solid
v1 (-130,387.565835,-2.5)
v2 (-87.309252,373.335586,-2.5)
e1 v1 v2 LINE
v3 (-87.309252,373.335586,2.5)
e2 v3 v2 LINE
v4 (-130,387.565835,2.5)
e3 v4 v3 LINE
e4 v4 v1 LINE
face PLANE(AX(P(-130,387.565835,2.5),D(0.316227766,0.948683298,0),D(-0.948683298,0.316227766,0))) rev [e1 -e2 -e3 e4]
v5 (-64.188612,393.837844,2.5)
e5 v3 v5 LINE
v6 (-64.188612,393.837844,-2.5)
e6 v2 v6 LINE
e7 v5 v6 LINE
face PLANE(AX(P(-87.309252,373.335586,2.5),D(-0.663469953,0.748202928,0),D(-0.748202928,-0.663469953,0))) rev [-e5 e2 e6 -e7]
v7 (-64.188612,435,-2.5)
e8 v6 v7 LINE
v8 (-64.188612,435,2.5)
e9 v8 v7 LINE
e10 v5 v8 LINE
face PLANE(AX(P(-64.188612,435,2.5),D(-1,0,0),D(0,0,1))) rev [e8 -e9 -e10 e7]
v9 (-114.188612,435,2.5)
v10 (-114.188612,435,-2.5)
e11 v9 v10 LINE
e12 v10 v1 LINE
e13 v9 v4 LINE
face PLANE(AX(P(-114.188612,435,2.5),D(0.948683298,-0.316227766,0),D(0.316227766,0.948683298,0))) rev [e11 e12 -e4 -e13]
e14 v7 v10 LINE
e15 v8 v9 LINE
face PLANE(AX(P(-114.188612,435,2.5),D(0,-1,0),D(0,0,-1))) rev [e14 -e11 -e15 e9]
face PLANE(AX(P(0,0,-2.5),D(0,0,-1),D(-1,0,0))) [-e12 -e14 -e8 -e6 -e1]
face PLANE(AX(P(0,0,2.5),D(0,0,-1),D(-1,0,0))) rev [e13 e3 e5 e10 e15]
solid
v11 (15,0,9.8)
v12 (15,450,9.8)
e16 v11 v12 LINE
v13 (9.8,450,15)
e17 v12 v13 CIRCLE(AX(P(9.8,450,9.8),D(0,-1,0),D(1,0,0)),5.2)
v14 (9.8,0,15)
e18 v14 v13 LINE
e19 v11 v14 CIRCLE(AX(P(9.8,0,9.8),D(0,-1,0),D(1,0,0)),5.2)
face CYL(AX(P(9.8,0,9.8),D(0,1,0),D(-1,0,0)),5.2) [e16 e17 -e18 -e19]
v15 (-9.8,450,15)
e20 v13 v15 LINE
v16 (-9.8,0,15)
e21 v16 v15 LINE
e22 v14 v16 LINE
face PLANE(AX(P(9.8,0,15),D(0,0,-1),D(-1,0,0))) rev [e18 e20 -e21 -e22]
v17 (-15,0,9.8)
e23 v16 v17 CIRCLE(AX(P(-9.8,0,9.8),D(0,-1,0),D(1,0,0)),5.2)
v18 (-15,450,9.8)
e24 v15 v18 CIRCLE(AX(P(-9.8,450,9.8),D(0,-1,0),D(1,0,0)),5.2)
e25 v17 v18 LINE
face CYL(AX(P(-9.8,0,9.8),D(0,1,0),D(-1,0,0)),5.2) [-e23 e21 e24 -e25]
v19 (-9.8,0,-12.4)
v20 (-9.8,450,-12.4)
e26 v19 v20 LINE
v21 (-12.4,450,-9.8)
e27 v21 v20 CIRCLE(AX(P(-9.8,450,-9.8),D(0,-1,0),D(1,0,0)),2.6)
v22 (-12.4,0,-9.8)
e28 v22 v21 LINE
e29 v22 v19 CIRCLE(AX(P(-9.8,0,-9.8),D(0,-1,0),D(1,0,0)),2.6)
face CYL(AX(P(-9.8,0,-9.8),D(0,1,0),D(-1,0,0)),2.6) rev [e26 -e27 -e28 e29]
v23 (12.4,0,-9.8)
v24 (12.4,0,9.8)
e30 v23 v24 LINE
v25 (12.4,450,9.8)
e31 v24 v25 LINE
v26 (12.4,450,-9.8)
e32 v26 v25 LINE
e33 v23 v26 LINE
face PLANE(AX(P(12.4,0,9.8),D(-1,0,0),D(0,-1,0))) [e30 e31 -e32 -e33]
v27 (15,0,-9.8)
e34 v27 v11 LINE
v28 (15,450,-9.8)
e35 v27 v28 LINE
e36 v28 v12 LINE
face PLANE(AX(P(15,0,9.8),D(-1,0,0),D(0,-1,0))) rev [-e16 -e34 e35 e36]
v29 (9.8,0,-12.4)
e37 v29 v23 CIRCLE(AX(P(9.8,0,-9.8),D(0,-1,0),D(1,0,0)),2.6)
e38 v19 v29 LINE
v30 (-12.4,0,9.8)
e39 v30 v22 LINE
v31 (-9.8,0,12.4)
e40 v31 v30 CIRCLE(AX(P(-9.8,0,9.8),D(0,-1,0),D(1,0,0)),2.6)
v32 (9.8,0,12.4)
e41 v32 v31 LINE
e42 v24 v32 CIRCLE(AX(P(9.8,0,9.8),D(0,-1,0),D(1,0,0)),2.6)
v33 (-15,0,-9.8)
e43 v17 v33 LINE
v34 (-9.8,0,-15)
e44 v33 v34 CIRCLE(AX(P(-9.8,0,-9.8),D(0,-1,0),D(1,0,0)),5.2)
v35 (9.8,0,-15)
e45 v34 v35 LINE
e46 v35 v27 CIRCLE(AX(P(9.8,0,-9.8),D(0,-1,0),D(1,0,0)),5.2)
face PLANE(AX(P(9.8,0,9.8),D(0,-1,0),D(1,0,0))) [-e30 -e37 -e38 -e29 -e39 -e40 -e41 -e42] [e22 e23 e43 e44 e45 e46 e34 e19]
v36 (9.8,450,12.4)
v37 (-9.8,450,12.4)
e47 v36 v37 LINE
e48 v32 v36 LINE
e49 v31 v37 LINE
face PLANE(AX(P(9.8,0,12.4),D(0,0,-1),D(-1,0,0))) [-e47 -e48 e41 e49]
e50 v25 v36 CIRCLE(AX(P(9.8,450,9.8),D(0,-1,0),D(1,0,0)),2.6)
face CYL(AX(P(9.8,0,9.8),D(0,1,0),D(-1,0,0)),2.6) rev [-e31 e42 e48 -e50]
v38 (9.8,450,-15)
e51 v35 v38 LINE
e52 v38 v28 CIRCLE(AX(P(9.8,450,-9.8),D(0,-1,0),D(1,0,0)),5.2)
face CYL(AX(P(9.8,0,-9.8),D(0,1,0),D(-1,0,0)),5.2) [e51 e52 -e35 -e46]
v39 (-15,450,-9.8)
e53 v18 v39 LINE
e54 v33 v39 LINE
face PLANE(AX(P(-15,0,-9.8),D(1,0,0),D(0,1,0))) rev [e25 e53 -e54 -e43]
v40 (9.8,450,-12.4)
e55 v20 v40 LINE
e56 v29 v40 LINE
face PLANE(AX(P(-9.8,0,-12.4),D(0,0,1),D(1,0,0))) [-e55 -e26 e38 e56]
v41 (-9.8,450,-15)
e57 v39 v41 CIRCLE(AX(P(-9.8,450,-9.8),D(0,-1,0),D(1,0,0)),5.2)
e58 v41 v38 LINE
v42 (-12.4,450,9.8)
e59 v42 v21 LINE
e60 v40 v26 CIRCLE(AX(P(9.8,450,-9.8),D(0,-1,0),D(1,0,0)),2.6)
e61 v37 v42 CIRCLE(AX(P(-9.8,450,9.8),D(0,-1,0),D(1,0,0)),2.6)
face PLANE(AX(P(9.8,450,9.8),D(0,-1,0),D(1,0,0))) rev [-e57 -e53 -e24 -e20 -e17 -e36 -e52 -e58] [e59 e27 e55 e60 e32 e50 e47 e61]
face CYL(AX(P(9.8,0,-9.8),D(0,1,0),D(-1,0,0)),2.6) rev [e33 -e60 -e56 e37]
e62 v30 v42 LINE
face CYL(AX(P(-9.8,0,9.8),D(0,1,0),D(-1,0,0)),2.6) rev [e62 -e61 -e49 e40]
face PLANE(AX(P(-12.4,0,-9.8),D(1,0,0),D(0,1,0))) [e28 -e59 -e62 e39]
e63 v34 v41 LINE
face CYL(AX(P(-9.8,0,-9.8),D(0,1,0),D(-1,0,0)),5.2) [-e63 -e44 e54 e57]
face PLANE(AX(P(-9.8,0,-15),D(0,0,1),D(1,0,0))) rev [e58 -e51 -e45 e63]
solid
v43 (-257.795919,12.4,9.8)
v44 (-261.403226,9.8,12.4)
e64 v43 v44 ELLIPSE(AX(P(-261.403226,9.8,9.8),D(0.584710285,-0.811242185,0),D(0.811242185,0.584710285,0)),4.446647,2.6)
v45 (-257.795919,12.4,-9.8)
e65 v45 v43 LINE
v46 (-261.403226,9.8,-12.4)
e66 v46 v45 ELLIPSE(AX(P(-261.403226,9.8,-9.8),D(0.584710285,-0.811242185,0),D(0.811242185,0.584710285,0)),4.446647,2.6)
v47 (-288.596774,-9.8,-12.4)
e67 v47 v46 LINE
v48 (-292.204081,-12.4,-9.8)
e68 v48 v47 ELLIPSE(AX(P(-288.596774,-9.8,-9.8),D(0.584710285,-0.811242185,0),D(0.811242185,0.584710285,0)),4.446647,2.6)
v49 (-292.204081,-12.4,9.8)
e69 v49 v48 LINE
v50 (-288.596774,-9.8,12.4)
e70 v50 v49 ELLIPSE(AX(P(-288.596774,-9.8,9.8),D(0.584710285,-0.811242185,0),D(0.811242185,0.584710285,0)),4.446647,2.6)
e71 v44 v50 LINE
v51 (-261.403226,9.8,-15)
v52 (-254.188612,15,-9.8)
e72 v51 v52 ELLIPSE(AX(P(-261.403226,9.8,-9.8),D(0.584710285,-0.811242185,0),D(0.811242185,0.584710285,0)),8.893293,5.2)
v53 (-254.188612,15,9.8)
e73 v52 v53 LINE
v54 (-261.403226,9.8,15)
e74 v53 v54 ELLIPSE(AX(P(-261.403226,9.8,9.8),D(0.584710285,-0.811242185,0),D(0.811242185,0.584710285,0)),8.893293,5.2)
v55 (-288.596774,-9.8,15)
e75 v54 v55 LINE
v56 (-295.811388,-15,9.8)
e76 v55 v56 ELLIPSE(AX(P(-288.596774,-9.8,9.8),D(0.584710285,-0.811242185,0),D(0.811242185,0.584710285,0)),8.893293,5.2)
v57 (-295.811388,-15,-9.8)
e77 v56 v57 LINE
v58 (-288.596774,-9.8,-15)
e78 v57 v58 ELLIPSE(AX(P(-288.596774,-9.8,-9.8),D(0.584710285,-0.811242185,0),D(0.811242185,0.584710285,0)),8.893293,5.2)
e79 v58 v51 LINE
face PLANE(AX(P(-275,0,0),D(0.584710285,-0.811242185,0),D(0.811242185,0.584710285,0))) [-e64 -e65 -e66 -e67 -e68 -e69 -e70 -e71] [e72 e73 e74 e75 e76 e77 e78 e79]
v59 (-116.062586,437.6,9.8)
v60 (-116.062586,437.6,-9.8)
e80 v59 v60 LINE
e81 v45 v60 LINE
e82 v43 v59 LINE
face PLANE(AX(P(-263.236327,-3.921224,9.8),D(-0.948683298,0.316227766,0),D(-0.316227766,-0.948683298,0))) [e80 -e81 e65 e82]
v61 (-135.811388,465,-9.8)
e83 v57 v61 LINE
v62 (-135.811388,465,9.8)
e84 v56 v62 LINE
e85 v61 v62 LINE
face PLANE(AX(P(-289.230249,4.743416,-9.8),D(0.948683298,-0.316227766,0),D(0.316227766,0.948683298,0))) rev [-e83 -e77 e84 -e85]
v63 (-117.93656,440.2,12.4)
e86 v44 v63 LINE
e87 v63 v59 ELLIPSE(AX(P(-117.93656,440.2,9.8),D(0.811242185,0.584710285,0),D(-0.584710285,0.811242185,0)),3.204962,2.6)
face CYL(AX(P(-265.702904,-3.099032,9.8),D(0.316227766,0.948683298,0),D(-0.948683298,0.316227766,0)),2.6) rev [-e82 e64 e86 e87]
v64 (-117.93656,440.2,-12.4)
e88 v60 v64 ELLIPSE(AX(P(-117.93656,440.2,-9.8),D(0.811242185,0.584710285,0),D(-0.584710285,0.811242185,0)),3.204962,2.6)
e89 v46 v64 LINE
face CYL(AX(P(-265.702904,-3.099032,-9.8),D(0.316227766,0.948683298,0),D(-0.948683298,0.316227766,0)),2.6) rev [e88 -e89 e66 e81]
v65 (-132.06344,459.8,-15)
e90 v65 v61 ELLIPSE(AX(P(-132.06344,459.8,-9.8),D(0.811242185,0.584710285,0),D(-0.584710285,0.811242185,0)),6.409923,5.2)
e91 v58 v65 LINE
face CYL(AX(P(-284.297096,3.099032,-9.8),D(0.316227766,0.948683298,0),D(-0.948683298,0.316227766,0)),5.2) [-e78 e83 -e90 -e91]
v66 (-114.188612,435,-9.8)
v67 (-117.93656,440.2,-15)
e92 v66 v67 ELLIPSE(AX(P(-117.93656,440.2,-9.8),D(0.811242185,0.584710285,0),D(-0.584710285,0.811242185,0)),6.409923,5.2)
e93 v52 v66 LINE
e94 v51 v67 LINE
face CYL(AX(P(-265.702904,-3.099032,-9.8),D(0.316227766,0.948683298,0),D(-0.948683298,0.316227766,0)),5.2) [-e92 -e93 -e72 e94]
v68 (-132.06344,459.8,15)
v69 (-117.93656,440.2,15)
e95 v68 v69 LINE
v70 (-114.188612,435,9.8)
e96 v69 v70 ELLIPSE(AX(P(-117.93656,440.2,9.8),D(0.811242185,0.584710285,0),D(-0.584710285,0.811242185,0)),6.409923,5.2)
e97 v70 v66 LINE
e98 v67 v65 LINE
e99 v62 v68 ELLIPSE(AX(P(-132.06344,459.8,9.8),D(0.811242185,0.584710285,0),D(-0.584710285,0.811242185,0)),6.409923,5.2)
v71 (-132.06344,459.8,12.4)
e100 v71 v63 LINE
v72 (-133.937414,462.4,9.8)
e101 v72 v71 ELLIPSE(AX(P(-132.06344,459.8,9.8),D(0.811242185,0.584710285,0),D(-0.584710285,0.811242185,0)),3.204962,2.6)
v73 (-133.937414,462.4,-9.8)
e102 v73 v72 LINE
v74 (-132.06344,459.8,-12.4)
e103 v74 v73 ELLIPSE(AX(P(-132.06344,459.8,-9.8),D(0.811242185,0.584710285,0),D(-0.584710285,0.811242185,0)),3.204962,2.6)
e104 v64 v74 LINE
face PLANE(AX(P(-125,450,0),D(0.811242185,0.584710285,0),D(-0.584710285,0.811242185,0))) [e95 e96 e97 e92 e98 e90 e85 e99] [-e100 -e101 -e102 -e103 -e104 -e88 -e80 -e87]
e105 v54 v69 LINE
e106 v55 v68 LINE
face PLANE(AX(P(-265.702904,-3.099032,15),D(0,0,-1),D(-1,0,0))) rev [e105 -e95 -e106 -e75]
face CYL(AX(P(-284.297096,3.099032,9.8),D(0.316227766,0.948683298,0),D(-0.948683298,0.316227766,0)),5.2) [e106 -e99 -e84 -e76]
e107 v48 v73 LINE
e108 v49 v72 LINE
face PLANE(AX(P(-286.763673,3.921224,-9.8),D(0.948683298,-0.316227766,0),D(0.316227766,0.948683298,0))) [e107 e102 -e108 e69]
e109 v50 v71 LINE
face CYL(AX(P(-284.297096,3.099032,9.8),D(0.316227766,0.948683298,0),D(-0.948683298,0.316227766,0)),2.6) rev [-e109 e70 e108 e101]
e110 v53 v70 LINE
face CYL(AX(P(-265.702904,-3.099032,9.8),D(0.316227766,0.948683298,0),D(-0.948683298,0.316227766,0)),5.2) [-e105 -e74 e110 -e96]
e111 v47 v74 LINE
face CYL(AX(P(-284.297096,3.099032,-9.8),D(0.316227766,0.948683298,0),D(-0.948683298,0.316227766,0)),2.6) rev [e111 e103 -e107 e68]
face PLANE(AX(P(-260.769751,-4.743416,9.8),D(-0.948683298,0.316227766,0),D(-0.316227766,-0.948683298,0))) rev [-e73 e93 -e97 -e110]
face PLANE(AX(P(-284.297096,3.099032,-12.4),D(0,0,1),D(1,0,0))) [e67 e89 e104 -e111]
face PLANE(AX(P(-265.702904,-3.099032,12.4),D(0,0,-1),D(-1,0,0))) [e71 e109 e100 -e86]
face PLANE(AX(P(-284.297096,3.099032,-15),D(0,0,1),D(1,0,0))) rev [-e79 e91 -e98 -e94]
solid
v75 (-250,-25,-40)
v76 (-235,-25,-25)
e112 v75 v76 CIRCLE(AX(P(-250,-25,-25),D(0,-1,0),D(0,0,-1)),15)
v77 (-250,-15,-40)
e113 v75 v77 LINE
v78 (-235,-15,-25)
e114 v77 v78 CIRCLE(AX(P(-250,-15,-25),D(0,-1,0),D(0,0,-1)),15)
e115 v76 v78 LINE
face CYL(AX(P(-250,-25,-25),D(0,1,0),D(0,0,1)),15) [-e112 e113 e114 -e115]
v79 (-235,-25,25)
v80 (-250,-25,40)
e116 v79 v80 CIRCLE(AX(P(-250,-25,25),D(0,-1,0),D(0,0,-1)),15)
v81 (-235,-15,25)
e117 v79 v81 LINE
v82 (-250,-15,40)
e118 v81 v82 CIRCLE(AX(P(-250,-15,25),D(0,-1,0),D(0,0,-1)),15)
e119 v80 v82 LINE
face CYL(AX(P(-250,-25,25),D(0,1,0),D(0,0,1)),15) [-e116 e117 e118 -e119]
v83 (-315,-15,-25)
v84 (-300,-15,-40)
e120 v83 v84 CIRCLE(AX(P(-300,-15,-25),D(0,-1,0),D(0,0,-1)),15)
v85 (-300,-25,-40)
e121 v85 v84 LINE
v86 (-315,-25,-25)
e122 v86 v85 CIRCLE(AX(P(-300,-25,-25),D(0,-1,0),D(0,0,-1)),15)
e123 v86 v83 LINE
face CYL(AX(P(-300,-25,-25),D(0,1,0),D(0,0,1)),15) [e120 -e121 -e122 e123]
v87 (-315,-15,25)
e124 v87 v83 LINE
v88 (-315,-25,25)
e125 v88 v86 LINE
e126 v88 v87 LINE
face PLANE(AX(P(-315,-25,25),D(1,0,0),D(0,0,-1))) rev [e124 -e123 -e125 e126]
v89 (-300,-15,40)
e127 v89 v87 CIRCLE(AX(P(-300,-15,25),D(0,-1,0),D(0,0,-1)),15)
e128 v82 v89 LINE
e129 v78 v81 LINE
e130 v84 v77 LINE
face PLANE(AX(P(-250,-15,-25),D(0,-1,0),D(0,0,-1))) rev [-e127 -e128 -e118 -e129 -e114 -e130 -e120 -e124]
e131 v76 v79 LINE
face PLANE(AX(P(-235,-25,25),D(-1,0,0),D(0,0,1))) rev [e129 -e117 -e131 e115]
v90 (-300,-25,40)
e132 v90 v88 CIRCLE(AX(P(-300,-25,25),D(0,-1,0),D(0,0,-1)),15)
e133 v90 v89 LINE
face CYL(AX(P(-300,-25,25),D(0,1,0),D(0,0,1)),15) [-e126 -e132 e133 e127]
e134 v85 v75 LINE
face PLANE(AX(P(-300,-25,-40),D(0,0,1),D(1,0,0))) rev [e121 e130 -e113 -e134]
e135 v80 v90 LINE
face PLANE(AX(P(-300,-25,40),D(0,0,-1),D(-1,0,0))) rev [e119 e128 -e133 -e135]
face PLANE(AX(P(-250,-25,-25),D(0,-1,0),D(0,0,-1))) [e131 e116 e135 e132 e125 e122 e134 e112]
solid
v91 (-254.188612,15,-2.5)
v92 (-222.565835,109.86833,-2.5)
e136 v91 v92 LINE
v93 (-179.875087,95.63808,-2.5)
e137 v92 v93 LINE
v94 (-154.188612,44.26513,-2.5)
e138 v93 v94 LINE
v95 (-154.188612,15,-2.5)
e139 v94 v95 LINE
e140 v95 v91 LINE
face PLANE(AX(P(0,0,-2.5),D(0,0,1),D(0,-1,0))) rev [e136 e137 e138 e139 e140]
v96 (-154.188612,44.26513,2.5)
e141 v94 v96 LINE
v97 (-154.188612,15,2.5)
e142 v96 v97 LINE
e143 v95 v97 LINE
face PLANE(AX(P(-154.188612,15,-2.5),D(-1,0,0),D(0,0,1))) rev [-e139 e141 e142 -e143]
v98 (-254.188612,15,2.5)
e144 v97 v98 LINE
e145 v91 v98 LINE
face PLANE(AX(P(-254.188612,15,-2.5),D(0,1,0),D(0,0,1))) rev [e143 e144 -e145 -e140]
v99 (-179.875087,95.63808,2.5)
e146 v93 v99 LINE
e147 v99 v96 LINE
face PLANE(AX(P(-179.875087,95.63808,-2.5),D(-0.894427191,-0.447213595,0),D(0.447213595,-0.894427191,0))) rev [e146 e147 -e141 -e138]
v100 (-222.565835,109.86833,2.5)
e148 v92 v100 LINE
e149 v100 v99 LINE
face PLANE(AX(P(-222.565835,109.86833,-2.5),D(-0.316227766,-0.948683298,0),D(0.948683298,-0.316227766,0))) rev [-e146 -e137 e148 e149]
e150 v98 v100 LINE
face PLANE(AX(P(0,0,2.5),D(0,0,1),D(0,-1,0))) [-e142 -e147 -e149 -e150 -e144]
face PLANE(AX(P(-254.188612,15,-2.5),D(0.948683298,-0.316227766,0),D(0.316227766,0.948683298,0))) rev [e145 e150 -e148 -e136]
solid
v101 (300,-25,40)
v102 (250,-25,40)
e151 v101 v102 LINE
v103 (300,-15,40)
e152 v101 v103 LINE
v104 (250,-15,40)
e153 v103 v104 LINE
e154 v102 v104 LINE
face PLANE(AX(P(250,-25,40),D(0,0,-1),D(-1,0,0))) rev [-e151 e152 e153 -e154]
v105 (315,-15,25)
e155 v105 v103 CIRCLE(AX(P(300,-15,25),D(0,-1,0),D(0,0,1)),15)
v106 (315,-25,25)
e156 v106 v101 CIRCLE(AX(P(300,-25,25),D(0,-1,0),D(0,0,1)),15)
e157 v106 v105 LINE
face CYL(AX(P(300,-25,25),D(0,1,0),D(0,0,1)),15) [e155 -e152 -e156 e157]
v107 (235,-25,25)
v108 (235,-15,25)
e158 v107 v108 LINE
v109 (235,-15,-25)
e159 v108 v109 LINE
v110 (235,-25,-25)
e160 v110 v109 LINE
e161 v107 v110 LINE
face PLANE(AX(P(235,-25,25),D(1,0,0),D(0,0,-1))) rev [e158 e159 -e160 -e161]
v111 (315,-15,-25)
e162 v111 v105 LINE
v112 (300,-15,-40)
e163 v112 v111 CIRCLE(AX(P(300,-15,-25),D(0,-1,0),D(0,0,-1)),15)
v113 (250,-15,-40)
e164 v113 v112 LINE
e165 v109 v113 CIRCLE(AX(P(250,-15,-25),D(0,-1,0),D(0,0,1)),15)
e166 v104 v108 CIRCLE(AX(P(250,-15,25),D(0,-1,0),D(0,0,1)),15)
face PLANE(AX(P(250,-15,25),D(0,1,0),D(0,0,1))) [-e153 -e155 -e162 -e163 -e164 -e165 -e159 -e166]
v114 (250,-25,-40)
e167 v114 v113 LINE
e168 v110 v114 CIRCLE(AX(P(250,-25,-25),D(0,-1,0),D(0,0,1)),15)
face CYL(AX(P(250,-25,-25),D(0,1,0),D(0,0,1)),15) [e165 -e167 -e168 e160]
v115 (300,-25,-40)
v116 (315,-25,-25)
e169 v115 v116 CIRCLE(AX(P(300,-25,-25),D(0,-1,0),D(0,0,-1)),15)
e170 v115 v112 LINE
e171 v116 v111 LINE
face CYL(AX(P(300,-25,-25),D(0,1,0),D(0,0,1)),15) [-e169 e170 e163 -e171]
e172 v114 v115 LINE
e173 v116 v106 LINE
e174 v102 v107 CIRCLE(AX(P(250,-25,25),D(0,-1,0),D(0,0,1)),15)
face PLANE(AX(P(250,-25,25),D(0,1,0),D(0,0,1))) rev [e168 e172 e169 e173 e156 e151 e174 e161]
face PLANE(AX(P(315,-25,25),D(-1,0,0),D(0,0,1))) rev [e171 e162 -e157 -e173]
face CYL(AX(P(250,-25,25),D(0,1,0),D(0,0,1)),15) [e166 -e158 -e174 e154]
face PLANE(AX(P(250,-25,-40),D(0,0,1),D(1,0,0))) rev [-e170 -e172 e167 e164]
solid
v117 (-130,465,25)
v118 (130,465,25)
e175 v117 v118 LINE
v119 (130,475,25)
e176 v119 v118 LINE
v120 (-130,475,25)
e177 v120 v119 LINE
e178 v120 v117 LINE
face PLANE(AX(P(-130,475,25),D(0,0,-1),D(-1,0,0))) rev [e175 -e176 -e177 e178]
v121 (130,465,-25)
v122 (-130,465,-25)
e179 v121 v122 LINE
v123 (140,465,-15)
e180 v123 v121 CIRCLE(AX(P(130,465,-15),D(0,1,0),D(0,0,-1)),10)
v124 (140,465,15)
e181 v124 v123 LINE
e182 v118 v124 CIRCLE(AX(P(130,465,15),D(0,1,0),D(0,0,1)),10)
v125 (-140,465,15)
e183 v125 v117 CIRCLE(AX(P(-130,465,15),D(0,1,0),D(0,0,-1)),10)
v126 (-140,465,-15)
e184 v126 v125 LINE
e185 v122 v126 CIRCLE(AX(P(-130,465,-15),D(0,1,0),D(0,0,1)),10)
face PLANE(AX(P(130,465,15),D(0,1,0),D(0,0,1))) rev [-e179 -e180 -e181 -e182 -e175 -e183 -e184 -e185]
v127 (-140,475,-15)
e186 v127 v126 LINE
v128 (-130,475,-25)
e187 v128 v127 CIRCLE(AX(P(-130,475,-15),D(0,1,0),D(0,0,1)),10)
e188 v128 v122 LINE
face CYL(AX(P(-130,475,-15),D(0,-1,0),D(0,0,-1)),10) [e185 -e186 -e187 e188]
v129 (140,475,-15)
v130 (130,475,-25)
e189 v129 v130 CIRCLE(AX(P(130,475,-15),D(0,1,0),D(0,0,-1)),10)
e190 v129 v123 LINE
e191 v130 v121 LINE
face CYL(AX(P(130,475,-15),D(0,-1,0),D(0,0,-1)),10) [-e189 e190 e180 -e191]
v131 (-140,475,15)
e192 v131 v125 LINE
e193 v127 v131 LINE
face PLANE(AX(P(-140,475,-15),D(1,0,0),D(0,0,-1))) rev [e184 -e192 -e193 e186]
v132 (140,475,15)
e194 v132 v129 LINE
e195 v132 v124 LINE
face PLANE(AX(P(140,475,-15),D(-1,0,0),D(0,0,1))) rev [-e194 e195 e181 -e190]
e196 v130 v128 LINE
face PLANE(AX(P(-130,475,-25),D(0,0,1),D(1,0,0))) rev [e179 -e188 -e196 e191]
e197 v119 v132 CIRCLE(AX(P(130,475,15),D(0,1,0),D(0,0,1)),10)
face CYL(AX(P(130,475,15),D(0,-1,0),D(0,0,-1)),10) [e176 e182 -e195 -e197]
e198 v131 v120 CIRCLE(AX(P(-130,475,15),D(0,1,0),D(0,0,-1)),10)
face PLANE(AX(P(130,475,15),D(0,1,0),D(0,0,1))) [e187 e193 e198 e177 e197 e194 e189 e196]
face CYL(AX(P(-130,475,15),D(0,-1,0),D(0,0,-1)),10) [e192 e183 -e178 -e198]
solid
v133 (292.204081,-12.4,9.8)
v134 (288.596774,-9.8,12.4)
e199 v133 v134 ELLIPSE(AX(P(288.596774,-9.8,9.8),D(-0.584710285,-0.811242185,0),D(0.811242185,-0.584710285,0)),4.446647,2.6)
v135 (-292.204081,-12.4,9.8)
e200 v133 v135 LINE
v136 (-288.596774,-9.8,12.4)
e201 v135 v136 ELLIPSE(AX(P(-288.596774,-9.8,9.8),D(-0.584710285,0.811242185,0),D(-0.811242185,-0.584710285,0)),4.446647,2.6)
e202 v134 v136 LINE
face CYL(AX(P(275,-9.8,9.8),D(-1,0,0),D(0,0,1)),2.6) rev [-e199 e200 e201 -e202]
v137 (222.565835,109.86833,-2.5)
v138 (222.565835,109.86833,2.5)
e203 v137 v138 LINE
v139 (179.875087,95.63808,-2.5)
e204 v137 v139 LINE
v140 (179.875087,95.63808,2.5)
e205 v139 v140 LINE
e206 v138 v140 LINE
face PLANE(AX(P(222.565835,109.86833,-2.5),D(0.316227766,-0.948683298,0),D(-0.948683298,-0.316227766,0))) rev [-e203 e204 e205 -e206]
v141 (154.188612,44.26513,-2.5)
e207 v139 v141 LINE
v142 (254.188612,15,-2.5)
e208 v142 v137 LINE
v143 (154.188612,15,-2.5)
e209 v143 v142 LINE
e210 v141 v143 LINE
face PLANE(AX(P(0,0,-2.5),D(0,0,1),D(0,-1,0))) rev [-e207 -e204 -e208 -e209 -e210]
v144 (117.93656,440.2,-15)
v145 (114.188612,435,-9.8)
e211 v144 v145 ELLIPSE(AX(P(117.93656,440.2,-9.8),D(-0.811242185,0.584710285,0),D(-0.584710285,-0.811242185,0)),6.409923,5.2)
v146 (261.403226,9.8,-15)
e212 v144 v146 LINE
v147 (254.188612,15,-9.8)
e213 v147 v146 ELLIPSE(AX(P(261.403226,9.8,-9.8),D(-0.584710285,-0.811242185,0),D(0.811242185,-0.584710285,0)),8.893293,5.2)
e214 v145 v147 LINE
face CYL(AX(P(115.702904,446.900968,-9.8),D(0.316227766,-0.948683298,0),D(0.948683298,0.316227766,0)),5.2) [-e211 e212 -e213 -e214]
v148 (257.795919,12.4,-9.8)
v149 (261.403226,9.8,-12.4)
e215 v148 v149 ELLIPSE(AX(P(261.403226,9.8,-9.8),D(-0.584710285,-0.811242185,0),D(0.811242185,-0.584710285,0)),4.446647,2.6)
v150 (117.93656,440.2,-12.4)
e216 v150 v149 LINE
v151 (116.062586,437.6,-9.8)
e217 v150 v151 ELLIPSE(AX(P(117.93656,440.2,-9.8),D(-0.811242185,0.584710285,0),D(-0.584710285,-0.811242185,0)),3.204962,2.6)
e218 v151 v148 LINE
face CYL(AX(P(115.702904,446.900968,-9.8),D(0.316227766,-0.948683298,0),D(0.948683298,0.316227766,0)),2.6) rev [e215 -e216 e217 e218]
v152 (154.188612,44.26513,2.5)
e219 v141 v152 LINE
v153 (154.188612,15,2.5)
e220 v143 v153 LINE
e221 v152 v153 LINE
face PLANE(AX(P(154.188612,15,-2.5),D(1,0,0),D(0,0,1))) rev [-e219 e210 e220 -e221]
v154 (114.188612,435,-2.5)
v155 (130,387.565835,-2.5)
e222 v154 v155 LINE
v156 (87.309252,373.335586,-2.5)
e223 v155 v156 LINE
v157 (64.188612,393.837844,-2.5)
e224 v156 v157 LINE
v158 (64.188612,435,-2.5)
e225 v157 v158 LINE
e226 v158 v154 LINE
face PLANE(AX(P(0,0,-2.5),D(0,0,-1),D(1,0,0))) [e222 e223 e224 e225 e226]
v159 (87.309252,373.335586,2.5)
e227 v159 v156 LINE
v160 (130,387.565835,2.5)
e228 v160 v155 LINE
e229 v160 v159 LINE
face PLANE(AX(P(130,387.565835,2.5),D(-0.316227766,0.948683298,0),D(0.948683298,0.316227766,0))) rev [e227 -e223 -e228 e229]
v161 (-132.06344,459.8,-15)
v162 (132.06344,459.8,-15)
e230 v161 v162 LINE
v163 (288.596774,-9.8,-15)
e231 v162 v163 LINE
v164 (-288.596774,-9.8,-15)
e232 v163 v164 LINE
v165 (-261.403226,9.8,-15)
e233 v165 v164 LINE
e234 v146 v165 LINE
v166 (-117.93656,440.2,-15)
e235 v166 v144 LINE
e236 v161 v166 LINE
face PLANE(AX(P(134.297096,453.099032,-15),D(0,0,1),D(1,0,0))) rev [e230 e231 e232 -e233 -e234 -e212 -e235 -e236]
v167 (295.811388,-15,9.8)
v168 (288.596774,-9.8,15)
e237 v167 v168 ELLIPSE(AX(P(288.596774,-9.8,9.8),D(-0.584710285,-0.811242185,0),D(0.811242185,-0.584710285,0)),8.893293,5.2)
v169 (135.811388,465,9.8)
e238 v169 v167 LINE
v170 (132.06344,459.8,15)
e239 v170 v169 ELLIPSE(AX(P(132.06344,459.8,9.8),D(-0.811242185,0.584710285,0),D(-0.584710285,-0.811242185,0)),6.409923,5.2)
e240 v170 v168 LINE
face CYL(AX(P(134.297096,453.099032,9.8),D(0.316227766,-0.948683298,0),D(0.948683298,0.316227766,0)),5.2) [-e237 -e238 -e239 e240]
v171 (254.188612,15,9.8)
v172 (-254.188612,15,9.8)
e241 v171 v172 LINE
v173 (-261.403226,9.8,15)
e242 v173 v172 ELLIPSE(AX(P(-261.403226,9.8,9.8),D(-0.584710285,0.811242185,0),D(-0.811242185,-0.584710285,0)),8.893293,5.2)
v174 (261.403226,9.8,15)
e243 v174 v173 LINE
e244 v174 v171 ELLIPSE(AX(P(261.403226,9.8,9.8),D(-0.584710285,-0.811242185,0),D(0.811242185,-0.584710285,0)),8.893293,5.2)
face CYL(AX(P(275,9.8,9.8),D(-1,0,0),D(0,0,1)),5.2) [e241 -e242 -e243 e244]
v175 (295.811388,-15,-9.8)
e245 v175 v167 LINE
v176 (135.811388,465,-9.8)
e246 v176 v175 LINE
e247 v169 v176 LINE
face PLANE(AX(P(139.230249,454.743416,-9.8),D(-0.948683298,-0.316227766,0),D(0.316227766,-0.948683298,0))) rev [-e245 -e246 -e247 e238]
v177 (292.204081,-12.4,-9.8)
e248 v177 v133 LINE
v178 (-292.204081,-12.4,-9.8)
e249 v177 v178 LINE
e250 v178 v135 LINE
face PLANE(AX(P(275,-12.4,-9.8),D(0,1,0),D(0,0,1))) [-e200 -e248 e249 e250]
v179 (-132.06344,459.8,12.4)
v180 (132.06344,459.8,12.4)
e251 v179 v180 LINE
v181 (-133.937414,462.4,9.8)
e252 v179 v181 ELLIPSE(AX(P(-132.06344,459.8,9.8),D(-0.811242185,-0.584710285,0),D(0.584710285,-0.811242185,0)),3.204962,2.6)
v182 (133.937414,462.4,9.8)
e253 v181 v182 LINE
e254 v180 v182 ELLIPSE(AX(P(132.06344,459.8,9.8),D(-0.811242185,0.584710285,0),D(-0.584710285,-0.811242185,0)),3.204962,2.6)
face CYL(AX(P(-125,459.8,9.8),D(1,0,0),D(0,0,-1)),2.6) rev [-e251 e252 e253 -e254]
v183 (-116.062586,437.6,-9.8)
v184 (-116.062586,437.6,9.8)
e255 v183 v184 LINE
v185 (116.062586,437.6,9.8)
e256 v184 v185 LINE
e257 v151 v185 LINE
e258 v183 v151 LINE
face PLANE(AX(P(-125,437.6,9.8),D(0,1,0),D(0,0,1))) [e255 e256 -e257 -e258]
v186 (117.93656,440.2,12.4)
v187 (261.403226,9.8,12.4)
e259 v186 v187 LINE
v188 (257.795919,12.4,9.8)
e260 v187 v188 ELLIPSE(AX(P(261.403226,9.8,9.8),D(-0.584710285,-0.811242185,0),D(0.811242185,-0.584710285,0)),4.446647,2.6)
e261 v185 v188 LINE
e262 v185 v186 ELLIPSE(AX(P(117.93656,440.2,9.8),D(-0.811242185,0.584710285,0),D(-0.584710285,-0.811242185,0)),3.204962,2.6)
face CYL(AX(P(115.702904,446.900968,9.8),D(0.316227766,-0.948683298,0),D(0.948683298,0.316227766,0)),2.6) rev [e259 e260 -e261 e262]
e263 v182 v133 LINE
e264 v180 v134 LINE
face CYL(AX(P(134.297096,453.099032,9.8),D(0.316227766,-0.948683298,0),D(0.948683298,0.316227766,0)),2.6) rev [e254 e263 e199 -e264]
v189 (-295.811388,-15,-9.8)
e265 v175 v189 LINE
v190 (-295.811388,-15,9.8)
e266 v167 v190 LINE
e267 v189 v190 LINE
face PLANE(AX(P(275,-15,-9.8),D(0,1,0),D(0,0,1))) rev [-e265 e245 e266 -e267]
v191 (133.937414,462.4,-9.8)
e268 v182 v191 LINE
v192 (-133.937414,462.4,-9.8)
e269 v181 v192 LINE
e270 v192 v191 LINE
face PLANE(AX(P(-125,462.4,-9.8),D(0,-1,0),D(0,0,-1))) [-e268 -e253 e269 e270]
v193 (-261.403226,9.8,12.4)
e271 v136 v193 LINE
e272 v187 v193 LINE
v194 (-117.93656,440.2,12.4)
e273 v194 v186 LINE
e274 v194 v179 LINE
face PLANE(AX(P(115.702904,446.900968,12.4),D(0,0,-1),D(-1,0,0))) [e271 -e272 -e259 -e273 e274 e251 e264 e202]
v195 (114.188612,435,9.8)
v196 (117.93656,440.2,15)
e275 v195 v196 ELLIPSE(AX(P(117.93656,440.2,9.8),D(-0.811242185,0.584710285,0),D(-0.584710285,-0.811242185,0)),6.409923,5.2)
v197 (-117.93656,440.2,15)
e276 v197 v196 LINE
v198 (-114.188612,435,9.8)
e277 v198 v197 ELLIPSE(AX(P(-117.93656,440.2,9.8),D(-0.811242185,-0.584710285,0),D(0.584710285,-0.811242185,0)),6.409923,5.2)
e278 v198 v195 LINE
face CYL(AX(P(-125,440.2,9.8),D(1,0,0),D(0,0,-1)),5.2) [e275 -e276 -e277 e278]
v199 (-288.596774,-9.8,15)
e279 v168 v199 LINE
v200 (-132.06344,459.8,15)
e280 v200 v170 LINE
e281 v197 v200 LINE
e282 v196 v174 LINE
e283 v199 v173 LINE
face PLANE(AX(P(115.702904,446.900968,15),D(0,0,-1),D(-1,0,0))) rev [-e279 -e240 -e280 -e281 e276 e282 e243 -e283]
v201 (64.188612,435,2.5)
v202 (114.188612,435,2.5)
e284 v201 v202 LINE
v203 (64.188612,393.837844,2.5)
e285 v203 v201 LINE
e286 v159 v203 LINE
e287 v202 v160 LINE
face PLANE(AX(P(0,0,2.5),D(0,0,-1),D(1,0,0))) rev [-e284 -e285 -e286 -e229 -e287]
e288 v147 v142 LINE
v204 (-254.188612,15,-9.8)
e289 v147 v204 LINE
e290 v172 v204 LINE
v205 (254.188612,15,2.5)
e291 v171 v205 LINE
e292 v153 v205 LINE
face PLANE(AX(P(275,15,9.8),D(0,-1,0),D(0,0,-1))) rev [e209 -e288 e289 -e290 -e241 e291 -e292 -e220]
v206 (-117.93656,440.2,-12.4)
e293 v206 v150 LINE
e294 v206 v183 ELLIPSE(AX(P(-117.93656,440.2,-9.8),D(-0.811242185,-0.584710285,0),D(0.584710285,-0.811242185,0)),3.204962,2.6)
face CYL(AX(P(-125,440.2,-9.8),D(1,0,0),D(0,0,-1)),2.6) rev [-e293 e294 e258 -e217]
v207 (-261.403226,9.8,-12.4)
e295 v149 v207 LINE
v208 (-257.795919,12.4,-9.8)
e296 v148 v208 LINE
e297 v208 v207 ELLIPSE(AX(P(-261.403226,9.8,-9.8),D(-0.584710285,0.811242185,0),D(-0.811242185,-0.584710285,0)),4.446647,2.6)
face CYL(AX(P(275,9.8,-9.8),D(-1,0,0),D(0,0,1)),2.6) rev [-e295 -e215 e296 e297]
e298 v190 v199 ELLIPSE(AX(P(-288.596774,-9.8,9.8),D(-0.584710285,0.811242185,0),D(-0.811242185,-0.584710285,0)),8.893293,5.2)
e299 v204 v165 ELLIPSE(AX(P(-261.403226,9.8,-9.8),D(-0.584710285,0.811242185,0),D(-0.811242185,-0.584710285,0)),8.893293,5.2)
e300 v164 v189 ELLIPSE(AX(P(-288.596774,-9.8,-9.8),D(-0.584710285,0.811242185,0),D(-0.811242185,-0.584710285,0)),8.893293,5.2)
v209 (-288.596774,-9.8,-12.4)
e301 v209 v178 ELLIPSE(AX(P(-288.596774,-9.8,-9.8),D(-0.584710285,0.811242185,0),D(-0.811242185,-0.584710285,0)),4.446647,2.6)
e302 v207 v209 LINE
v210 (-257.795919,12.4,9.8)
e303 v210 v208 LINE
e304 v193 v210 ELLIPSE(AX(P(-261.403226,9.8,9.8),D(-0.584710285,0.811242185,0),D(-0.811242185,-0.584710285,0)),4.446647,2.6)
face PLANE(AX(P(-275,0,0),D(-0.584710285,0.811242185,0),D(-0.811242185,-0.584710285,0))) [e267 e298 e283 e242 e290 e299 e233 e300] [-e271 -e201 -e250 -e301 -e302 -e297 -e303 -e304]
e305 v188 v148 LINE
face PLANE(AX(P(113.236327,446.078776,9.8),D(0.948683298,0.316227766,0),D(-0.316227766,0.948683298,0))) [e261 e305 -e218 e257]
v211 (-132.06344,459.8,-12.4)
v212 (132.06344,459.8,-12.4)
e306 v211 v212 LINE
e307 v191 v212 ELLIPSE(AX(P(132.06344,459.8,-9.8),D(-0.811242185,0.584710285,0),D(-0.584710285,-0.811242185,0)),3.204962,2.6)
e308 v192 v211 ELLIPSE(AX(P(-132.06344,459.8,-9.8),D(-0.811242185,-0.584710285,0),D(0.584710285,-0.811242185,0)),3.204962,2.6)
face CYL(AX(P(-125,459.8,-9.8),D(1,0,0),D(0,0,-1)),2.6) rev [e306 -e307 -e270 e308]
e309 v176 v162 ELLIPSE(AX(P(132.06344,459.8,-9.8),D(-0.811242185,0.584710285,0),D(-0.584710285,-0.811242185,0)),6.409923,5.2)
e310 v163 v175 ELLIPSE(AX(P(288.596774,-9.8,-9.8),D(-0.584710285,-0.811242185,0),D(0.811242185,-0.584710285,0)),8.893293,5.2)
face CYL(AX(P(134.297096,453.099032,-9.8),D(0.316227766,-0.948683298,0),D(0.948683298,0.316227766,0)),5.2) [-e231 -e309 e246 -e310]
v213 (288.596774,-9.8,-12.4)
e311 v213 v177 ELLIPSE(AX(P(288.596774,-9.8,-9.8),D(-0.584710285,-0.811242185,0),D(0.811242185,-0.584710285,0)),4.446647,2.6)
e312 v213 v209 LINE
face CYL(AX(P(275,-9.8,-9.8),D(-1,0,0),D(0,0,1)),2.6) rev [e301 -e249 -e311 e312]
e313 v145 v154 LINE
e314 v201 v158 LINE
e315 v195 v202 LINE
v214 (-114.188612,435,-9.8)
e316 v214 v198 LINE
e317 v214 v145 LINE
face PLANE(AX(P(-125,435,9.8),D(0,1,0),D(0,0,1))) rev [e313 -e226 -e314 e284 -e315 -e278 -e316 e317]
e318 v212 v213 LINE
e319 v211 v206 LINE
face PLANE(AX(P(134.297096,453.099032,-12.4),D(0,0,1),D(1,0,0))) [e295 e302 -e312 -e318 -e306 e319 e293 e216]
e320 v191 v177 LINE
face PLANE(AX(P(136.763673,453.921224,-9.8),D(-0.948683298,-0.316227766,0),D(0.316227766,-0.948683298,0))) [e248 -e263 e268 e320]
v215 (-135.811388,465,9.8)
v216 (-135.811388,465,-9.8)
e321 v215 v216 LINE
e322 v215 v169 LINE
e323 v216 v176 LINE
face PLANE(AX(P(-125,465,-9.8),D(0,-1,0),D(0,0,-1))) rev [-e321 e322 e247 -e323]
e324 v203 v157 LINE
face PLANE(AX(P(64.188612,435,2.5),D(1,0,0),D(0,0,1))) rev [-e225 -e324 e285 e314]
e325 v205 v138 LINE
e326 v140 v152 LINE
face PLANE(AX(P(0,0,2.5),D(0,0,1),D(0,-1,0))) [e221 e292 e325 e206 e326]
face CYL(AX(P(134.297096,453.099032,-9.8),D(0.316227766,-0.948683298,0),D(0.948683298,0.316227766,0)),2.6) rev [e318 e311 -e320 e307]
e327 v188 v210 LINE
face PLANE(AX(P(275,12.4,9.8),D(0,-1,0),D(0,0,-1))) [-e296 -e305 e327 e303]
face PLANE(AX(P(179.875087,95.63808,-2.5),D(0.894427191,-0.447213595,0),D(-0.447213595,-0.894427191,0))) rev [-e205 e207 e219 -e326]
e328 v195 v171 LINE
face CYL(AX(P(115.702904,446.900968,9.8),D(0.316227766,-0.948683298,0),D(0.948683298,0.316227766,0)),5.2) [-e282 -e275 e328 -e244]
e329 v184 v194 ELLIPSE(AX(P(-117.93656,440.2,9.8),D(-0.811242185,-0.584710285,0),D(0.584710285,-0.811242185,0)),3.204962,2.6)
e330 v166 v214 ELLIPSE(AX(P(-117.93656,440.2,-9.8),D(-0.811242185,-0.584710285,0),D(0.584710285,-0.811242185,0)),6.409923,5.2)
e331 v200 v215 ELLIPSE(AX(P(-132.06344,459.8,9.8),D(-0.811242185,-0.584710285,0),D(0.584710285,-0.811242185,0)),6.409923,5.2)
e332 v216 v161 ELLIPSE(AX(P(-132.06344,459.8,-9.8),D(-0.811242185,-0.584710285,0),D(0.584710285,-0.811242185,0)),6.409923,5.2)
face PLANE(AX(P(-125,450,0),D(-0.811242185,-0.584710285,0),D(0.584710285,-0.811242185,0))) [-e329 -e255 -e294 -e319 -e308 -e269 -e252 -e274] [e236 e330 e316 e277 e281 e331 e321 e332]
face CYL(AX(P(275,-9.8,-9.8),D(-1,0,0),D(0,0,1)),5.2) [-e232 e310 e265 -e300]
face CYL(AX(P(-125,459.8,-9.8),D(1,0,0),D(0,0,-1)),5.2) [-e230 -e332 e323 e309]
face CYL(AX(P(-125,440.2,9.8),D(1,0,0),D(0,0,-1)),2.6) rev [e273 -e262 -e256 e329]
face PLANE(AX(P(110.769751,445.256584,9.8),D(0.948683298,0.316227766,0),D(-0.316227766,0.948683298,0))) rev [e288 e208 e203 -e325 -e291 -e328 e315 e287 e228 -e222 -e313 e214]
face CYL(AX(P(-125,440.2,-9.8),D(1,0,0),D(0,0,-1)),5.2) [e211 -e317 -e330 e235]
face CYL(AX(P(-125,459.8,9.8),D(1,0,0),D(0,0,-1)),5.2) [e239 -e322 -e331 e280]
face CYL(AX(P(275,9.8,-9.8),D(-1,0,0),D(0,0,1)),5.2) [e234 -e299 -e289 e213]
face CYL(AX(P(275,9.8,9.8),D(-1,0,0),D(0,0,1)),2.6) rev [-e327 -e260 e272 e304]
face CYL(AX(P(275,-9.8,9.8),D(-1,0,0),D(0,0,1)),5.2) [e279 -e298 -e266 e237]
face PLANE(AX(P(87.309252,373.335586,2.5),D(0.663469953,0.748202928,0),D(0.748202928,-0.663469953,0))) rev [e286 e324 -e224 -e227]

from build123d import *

# Parameters (mm, degrees)
SQUARE_TUBE_30_X_30_X_2_6_1_DEPTH      = 504.773396612
SQUARE_TUBE_30_X_30_X_2_6_1_DEPTH_BACK = 16.289611963
SQUARE_TUBE_30_X_30_X_2_6_1_2_DEPTH    = 610.863495174
SQUARE_TUBE_30_X_30_X_2_6_1_3_DEPTH    = 521.063008575
SQUARE_TUBE_30_X_30_X_2_6_1_4_DEPTH    = 282.579223926
BOSS_EXTRUDE1_DEPTH                    = 10
BOSS_EXTRUDE1_2_DEPTH                  = 10
BOSS_EXTRUDE2_DEPTH                    = 10
GUSSET1_START                          = -2.5
GUSSET1_DEPTH                          = 5
GUSSET2_START                          = -2.5
GUSSET2_DEPTH                          = 5
SQUARE_TUBE_30_X_30_X_2_6_2_DEPTH      = 450


# Read off the part's stored shape, not the designer's step: Gusset1, Gusset2
with BuildPart() as part:
    # Sketch11 → Square tube 30 X 30 X 2.6(1) (new, two sides: drawn at the far end of the back side and taken through both)
    with BuildSketch(Plane(origin=(-125, 450, 0), x_dir=(0.9486832980505138, -0.3162277660168379, 0), z_dir=(-0.31622776601683794, -0.9486832980505139, 0)).offset(-SQUARE_TUBE_30_X_30_X_2_6_1_DEPTH_BACK)):
        with BuildLine():
            Line((-9.8, -15), (9.8, -15))
            ThreePointArc((9.8, -15), (13.476955262, -13.476955262), (15, -9.8))
            Line((15, -9.8), (15, 9.8))
            ThreePointArc((15, 9.8), (13.476955262, 13.476955262), (9.8, 15))
            Line((9.8, 15), (-9.8, 15))
            ThreePointArc((-9.8, 15), (-13.476955262, 13.476955262), (-15, 9.8))
            Line((-15, 9.8), (-15, -9.8))
            ThreePointArc((-15, -9.8), (-13.476955262, -13.476955262), (-9.8, -15))
        make_face()
        with BuildLine():
            Line((-9.8, -12.4), (9.8, -12.4))
            ThreePointArc((9.8, -12.4), (11.638477631, -11.638477631), (12.4, -9.8))
            Line((12.4, -9.8), (12.4, 9.8))
            ThreePointArc((12.4, 9.8), (11.638477631, 11.638477631), (9.8, 12.4))
            Line((9.8, 12.4), (-9.8, 12.4))
            ThreePointArc((-9.8, 12.4), (-11.638477631, 11.638477631), (-12.4, 9.8))
            Line((-12.4, 9.8), (-12.4, -9.8))
            ThreePointArc((-12.4, -9.8), (-11.638477631, -11.638477631), (-9.8, -12.4))
        make_face(mode=Mode.SUBTRACT)
    extrude(amount=SQUARE_TUBE_30_X_30_X_2_6_1_DEPTH + SQUARE_TUBE_30_X_30_X_2_6_1_DEPTH_BACK)

    # Square tube 30 X 30 X 2.6(1) mitre 1
    split(bisect_by=Plane(origin=(-125, 450, 0), x_dir=(0.584710285, -0.811242185, 0), z_dir=(-0.811242185, -0.584710285, 0)), keep=Keep.TOP)

    # Square tube 30 X 30 X 2.6(1) mitre 2
    split(bisect_by=Plane(origin=(-275, 0, 0), x_dir=(-0.811242185, -0.584710285, 0), z_dir=(-0.584710285, 0.811242185, 0)), keep=Keep.TOP)


with BuildPart() as body_2:
    # Sketch11 on segment 2 (carried to segment 2) → Square tube 30 X 30 X 2.6_1 2 (new body)
    with BuildSketch(Plane.YZ.offset(-305.431747587)):
        with BuildLine():
            Line((-9.8, -15), (9.8, -15))
            ThreePointArc((9.8, -15), (13.476955262, -13.476955262), (15, -9.8))
            Line((15, -9.8), (15, 9.8))
            ThreePointArc((15, 9.8), (13.476955262, 13.476955262), (9.8, 15))
            Line((9.8, 15), (-9.8, 15))
            ThreePointArc((-9.8, 15), (-13.476955262, 13.476955262), (-15, 9.8))
            Line((-15, 9.8), (-15, -9.8))
            ThreePointArc((-15, -9.8), (-13.476955262, -13.476955262), (-9.8, -15))
        make_face()
        with BuildLine():
            Line((-9.8, -12.4), (9.8, -12.4))
            ThreePointArc((9.8, -12.4), (11.638477631, -11.638477631), (12.4, -9.8))
            Line((12.4, -9.8), (12.4, 9.8))
            ThreePointArc((12.4, 9.8), (11.638477631, 11.638477631), (9.8, 12.4))
            Line((9.8, 12.4), (-9.8, 12.4))
            ThreePointArc((-9.8, 12.4), (-11.638477631, 11.638477631), (-12.4, 9.8))
            Line((-12.4, 9.8), (-12.4, -9.8))
            ThreePointArc((-12.4, -9.8), (-11.638477631, -11.638477631), (-9.8, -12.4))
        make_face(mode=Mode.SUBTRACT)
    extrude(amount=SQUARE_TUBE_30_X_30_X_2_6_1_2_DEPTH)

    # Square tube 30 X 30 X 2.6_1 2 mitre 1
    split(bisect_by=Plane(origin=(-275, 0, 0), x_dir=(0.811242185, 0.584710285, 0), z_dir=(0.584710285, -0.811242185, 0)), keep=Keep.TOP)

    # Square tube 30 X 30 X 2.6_1 2 mitre 2
    split(bisect_by=Plane(origin=(275, 0, 0), x_dir=(0.811242185, -0.584710285, 0), z_dir=(-0.584710285, -0.811242185, 0)), keep=Keep.TOP)


with BuildPart() as body_3:
    # Sketch11 on segment 3 (carried to segment 3) → Square tube 30 X 30 X 2.6_1 3 (new body)
    with BuildSketch(Plane(origin=(284.623363555, -28.870090666, 0), x_dir=(-0.948683298, -0.316227766, 0), z_dir=(-0.316227766, 0.948683298, 0))):
        with BuildLine():
            Line((-9.8, -15), (9.8, -15))
            ThreePointArc((9.8, -15), (13.476955262, -13.476955262), (15, -9.8))
            Line((15, -9.8), (15, 9.8))
            ThreePointArc((15, 9.8), (13.476955262, 13.476955262), (9.8, 15))
            Line((9.8, 15), (-9.8, 15))
            ThreePointArc((-9.8, 15), (-13.476955262, 13.476955262), (-15, 9.8))
            Line((-15, 9.8), (-15, -9.8))
            ThreePointArc((-15, -9.8), (-13.476955262, -13.476955262), (-9.8, -15))
        make_face()
        with BuildLine():
            Line((-9.8, -12.4), (9.8, -12.4))
            ThreePointArc((9.8, -12.4), (11.638477631, -11.638477631), (12.4, -9.8))
            Line((12.4, -9.8), (12.4, 9.8))
            ThreePointArc((12.4, 9.8), (11.638477631, 11.638477631), (9.8, 12.4))
            Line((9.8, 12.4), (-9.8, 12.4))
            ThreePointArc((-9.8, 12.4), (-11.638477631, 11.638477631), (-12.4, 9.8))
            Line((-12.4, 9.8), (-12.4, -9.8))
            ThreePointArc((-12.4, -9.8), (-11.638477631, -11.638477631), (-9.8, -12.4))
        make_face(mode=Mode.SUBTRACT)
    extrude(amount=SQUARE_TUBE_30_X_30_X_2_6_1_3_DEPTH)

    # Square tube 30 X 30 X 2.6_1 3 mitre 1
    split(bisect_by=Plane(origin=(275, 0, 0), x_dir=(-0.811242185, 0.584710285, 0), z_dir=(0.584710285, 0.811242185, 0)), keep=Keep.TOP)

    # Square tube 30 X 30 X 2.6_1 3 mitre 2
    split(bisect_by=Plane(origin=(125, 450, 0), x_dir=(0.584710285, 0.811242185, 0), z_dir=(0.811242185, -0.584710285, 0)), keep=Keep.TOP)


with BuildPart() as body_4:
    # Sketch11 on segment 4 (carried to segment 4) → Square tube 30 X 30 X 2.6_1 4 (new body)
    with BuildSketch(Plane(origin=(141.289611963, 450, 0), x_dir=(0, -1, 0), z_dir=(-1, 0, 0))):
        with BuildLine():
            Line((-9.8, -15), (9.8, -15))
            ThreePointArc((9.8, -15), (13.476955262, -13.476955262), (15, -9.8))
            Line((15, -9.8), (15, 9.8))
            ThreePointArc((15, 9.8), (13.476955262, 13.476955262), (9.8, 15))
            Line((9.8, 15), (-9.8, 15))
            ThreePointArc((-9.8, 15), (-13.476955262, 13.476955262), (-15, 9.8))
            Line((-15, 9.8), (-15, -9.8))
            ThreePointArc((-15, -9.8), (-13.476955262, -13.476955262), (-9.8, -15))
        make_face()
        with BuildLine():
            Line((-9.8, -12.4), (9.8, -12.4))
            ThreePointArc((9.8, -12.4), (11.638477631, -11.638477631), (12.4, -9.8))
            Line((12.4, -9.8), (12.4, 9.8))
            ThreePointArc((12.4, 9.8), (11.638477631, 11.638477631), (9.8, 12.4))
            Line((9.8, 12.4), (-9.8, 12.4))
            ThreePointArc((-9.8, 12.4), (-11.638477631, 11.638477631), (-12.4, 9.8))
            Line((-12.4, 9.8), (-12.4, -9.8))
            ThreePointArc((-12.4, -9.8), (-11.638477631, -11.638477631), (-9.8, -12.4))
        make_face(mode=Mode.SUBTRACT)
    extrude(amount=SQUARE_TUBE_30_X_30_X_2_6_1_4_DEPTH)

    # Square tube 30 X 30 X 2.6_1 4 mitre 1
    split(bisect_by=Plane(origin=(125, 450, 0), x_dir=(-0.584710285, -0.811242185, 0), z_dir=(-0.811242185, 0.584710285, 0)), keep=Keep.TOP)

    # Square tube 30 X 30 X 2.6_1 4 mitre 2
    split(bisect_by=Plane(origin=(-125, 450, 0), x_dir=(-0.584710285, 0.811242185, 0), z_dir=(0.811242185, 0.584710285, 0)), keep=Keep.TOP)


with BuildPart() as body_5:
    # Sketch12 → Boss-Extrude1 (new body)
    with BuildSketch(Plane.XZ.offset(15)):
        with BuildLine():
            Line((-300, 40), (-250, 40))
            ThreePointArc((-250, 40), (-239.393398282, 35.606601718), (-235, 25))
            Line((-235, 25), (-235, -25))
            ThreePointArc((-235, -25), (-239.393398282, -35.606601718), (-250, -40))
            Line((-250, -40), (-300, -40))
            ThreePointArc((-300, -40), (-310.606601718, -35.606601718), (-315, -25))
            Line((-315, -25), (-315, 25))
            ThreePointArc((-315, 25), (-310.606601718, 35.606601718), (-300, 40))
        make_face()
    extrude(amount=BOSS_EXTRUDE1_DEPTH)


with BuildPart() as body_6:
    # Sketch12 → Boss-Extrude1 2 (new body)
    with BuildSketch(Plane.XZ.offset(15)):
        with BuildLine():
            Line((250, 40), (300, 40))
            ThreePointArc((300, 40), (310.606601718, 35.606601718), (315, 25))
            Line((315, 25), (315, -25))
            ThreePointArc((315, -25), (310.606601718, -35.606601718), (300, -40))
            Line((300, -40), (250, -40))
            ThreePointArc((250, -40), (239.393398282, -35.606601718), (235, -25))
            Line((235, -25), (235, 25))
            ThreePointArc((235, 25), (239.393398282, 35.606601718), (250, 40))
        make_face()
    extrude(amount=BOSS_EXTRUDE1_2_DEPTH)


with BuildPart() as body_7:
    # Sketch13 → Boss-Extrude2 (new body)
    with BuildSketch(Plane(origin=(0, 465, 0), x_dir=(1, 0, 0), z_dir=(0, 1, 0))):
        with BuildLine():
            Line((-130, 25), (130, 25))
            ThreePointArc((130, 25), (137.071067812, 22.071067812), (140, 15))
            Line((140, 15), (140, -15))
            ThreePointArc((140, -15), (137.071067812, -22.071067812), (130, -25))
            Line((130, -25), (-130, -25))
            ThreePointArc((-130, -25), (-137.071067812, -22.071067812), (-140, -15))
            Line((-140, -15), (-140, 15))
            ThreePointArc((-140, 15), (-137.071067812, 22.071067812), (-130, 25))
        make_face()
    extrude(amount=BOSS_EXTRUDE2_DEPTH)


with BuildPart() as body_8:
    # Gusset1 outline → Gusset1 (new body)
    with BuildSketch(Plane.XY.offset(GUSSET1_START)):
        Polygon((-179.875086685, 95.638080334), (-222.565835097, 109.868329805), (-254.188611699, 15), (-154.188611699, 15), (-154.188611699, 44.265130362), align=None)
    gusset1 = extrude(amount=GUSSET1_DEPTH)


with BuildPart() as body_9:
    # Gusset2 outline → Gusset2 (new body)
    with BuildSketch(Plane.XY.offset(GUSSET2_START)):
        Polygon((-130, 387.565835097), (-87.309251588, 373.335585627), (-64.188611699, 393.837844167), (-64.188611699, 435), (-114.188611699, 435), align=None)
    gusset2 = extrude(amount=GUSSET2_DEPTH)


with BuildPart() as body_2_1:
    add(body_2.part)

    add(body_3.part)  # Mirror1 merges body 3

    add(body_4.part)  # Mirror1 merges body 4
    # Mirror1: Gusset1, Gusset2 across plane
    add(gusset1.mirror(Plane(origin=(0, 0, 0), x_dir=(0, 0, 1), z_dir=(1, 0, 0))))
    add(gusset2.mirror(Plane(origin=(0, 0, 0), x_dir=(0, 0, 1), z_dir=(1, 0, 0))))


with BuildPart() as body_8_2:
    # Sketch141 → Square tube 30 X 30 X 2.6(2) (new body)
    with BuildSketch(Plane.XZ.offset(-450)):
        with BuildLine():
            Line((-9.8, -15), (9.8, -15))
            ThreePointArc((9.8, -15), (13.476955262, -13.476955262), (15, -9.8))
            Line((15, -9.8), (15, 9.8))
            ThreePointArc((15, 9.8), (13.476955262, 13.476955262), (9.8, 15))
            Line((9.8, 15), (-9.8, 15))
            ThreePointArc((-9.8, 15), (-13.476955262, 13.476955262), (-15, 9.8))
            Line((-15, 9.8), (-15, -9.8))
            ThreePointArc((-15, -9.8), (-13.476955262, -13.476955262), (-9.8, -15))
        make_face()
        with BuildLine():
            Line((-9.8, -12.4), (9.8, -12.4))
            ThreePointArc((9.8, -12.4), (11.638477631, -11.638477631), (12.4, -9.8))
            Line((12.4, -9.8), (12.4, 9.8))
            ThreePointArc((12.4, 9.8), (11.638477631, 11.638477631), (9.8, 12.4))
            Line((9.8, 12.4), (-9.8, 12.4))
            ThreePointArc((-9.8, 12.4), (-11.638477631, 11.638477631), (-12.4, 9.8))
            Line((-12.4, 9.8), (-12.4, -9.8))
            ThreePointArc((-12.4, -9.8), (-11.638477631, -11.638477631), (-9.8, -12.4))
        make_face(mode=Mode.SUBTRACT)
    extrude(amount=SQUARE_TUBE_30_X_30_X_2_6_2_DEPTH)


solid = Compound([part.part, body_5.part, body_6.part, body_7.part, body_8.part, body_9.part, body_2_1.part, body_8_2.part])
